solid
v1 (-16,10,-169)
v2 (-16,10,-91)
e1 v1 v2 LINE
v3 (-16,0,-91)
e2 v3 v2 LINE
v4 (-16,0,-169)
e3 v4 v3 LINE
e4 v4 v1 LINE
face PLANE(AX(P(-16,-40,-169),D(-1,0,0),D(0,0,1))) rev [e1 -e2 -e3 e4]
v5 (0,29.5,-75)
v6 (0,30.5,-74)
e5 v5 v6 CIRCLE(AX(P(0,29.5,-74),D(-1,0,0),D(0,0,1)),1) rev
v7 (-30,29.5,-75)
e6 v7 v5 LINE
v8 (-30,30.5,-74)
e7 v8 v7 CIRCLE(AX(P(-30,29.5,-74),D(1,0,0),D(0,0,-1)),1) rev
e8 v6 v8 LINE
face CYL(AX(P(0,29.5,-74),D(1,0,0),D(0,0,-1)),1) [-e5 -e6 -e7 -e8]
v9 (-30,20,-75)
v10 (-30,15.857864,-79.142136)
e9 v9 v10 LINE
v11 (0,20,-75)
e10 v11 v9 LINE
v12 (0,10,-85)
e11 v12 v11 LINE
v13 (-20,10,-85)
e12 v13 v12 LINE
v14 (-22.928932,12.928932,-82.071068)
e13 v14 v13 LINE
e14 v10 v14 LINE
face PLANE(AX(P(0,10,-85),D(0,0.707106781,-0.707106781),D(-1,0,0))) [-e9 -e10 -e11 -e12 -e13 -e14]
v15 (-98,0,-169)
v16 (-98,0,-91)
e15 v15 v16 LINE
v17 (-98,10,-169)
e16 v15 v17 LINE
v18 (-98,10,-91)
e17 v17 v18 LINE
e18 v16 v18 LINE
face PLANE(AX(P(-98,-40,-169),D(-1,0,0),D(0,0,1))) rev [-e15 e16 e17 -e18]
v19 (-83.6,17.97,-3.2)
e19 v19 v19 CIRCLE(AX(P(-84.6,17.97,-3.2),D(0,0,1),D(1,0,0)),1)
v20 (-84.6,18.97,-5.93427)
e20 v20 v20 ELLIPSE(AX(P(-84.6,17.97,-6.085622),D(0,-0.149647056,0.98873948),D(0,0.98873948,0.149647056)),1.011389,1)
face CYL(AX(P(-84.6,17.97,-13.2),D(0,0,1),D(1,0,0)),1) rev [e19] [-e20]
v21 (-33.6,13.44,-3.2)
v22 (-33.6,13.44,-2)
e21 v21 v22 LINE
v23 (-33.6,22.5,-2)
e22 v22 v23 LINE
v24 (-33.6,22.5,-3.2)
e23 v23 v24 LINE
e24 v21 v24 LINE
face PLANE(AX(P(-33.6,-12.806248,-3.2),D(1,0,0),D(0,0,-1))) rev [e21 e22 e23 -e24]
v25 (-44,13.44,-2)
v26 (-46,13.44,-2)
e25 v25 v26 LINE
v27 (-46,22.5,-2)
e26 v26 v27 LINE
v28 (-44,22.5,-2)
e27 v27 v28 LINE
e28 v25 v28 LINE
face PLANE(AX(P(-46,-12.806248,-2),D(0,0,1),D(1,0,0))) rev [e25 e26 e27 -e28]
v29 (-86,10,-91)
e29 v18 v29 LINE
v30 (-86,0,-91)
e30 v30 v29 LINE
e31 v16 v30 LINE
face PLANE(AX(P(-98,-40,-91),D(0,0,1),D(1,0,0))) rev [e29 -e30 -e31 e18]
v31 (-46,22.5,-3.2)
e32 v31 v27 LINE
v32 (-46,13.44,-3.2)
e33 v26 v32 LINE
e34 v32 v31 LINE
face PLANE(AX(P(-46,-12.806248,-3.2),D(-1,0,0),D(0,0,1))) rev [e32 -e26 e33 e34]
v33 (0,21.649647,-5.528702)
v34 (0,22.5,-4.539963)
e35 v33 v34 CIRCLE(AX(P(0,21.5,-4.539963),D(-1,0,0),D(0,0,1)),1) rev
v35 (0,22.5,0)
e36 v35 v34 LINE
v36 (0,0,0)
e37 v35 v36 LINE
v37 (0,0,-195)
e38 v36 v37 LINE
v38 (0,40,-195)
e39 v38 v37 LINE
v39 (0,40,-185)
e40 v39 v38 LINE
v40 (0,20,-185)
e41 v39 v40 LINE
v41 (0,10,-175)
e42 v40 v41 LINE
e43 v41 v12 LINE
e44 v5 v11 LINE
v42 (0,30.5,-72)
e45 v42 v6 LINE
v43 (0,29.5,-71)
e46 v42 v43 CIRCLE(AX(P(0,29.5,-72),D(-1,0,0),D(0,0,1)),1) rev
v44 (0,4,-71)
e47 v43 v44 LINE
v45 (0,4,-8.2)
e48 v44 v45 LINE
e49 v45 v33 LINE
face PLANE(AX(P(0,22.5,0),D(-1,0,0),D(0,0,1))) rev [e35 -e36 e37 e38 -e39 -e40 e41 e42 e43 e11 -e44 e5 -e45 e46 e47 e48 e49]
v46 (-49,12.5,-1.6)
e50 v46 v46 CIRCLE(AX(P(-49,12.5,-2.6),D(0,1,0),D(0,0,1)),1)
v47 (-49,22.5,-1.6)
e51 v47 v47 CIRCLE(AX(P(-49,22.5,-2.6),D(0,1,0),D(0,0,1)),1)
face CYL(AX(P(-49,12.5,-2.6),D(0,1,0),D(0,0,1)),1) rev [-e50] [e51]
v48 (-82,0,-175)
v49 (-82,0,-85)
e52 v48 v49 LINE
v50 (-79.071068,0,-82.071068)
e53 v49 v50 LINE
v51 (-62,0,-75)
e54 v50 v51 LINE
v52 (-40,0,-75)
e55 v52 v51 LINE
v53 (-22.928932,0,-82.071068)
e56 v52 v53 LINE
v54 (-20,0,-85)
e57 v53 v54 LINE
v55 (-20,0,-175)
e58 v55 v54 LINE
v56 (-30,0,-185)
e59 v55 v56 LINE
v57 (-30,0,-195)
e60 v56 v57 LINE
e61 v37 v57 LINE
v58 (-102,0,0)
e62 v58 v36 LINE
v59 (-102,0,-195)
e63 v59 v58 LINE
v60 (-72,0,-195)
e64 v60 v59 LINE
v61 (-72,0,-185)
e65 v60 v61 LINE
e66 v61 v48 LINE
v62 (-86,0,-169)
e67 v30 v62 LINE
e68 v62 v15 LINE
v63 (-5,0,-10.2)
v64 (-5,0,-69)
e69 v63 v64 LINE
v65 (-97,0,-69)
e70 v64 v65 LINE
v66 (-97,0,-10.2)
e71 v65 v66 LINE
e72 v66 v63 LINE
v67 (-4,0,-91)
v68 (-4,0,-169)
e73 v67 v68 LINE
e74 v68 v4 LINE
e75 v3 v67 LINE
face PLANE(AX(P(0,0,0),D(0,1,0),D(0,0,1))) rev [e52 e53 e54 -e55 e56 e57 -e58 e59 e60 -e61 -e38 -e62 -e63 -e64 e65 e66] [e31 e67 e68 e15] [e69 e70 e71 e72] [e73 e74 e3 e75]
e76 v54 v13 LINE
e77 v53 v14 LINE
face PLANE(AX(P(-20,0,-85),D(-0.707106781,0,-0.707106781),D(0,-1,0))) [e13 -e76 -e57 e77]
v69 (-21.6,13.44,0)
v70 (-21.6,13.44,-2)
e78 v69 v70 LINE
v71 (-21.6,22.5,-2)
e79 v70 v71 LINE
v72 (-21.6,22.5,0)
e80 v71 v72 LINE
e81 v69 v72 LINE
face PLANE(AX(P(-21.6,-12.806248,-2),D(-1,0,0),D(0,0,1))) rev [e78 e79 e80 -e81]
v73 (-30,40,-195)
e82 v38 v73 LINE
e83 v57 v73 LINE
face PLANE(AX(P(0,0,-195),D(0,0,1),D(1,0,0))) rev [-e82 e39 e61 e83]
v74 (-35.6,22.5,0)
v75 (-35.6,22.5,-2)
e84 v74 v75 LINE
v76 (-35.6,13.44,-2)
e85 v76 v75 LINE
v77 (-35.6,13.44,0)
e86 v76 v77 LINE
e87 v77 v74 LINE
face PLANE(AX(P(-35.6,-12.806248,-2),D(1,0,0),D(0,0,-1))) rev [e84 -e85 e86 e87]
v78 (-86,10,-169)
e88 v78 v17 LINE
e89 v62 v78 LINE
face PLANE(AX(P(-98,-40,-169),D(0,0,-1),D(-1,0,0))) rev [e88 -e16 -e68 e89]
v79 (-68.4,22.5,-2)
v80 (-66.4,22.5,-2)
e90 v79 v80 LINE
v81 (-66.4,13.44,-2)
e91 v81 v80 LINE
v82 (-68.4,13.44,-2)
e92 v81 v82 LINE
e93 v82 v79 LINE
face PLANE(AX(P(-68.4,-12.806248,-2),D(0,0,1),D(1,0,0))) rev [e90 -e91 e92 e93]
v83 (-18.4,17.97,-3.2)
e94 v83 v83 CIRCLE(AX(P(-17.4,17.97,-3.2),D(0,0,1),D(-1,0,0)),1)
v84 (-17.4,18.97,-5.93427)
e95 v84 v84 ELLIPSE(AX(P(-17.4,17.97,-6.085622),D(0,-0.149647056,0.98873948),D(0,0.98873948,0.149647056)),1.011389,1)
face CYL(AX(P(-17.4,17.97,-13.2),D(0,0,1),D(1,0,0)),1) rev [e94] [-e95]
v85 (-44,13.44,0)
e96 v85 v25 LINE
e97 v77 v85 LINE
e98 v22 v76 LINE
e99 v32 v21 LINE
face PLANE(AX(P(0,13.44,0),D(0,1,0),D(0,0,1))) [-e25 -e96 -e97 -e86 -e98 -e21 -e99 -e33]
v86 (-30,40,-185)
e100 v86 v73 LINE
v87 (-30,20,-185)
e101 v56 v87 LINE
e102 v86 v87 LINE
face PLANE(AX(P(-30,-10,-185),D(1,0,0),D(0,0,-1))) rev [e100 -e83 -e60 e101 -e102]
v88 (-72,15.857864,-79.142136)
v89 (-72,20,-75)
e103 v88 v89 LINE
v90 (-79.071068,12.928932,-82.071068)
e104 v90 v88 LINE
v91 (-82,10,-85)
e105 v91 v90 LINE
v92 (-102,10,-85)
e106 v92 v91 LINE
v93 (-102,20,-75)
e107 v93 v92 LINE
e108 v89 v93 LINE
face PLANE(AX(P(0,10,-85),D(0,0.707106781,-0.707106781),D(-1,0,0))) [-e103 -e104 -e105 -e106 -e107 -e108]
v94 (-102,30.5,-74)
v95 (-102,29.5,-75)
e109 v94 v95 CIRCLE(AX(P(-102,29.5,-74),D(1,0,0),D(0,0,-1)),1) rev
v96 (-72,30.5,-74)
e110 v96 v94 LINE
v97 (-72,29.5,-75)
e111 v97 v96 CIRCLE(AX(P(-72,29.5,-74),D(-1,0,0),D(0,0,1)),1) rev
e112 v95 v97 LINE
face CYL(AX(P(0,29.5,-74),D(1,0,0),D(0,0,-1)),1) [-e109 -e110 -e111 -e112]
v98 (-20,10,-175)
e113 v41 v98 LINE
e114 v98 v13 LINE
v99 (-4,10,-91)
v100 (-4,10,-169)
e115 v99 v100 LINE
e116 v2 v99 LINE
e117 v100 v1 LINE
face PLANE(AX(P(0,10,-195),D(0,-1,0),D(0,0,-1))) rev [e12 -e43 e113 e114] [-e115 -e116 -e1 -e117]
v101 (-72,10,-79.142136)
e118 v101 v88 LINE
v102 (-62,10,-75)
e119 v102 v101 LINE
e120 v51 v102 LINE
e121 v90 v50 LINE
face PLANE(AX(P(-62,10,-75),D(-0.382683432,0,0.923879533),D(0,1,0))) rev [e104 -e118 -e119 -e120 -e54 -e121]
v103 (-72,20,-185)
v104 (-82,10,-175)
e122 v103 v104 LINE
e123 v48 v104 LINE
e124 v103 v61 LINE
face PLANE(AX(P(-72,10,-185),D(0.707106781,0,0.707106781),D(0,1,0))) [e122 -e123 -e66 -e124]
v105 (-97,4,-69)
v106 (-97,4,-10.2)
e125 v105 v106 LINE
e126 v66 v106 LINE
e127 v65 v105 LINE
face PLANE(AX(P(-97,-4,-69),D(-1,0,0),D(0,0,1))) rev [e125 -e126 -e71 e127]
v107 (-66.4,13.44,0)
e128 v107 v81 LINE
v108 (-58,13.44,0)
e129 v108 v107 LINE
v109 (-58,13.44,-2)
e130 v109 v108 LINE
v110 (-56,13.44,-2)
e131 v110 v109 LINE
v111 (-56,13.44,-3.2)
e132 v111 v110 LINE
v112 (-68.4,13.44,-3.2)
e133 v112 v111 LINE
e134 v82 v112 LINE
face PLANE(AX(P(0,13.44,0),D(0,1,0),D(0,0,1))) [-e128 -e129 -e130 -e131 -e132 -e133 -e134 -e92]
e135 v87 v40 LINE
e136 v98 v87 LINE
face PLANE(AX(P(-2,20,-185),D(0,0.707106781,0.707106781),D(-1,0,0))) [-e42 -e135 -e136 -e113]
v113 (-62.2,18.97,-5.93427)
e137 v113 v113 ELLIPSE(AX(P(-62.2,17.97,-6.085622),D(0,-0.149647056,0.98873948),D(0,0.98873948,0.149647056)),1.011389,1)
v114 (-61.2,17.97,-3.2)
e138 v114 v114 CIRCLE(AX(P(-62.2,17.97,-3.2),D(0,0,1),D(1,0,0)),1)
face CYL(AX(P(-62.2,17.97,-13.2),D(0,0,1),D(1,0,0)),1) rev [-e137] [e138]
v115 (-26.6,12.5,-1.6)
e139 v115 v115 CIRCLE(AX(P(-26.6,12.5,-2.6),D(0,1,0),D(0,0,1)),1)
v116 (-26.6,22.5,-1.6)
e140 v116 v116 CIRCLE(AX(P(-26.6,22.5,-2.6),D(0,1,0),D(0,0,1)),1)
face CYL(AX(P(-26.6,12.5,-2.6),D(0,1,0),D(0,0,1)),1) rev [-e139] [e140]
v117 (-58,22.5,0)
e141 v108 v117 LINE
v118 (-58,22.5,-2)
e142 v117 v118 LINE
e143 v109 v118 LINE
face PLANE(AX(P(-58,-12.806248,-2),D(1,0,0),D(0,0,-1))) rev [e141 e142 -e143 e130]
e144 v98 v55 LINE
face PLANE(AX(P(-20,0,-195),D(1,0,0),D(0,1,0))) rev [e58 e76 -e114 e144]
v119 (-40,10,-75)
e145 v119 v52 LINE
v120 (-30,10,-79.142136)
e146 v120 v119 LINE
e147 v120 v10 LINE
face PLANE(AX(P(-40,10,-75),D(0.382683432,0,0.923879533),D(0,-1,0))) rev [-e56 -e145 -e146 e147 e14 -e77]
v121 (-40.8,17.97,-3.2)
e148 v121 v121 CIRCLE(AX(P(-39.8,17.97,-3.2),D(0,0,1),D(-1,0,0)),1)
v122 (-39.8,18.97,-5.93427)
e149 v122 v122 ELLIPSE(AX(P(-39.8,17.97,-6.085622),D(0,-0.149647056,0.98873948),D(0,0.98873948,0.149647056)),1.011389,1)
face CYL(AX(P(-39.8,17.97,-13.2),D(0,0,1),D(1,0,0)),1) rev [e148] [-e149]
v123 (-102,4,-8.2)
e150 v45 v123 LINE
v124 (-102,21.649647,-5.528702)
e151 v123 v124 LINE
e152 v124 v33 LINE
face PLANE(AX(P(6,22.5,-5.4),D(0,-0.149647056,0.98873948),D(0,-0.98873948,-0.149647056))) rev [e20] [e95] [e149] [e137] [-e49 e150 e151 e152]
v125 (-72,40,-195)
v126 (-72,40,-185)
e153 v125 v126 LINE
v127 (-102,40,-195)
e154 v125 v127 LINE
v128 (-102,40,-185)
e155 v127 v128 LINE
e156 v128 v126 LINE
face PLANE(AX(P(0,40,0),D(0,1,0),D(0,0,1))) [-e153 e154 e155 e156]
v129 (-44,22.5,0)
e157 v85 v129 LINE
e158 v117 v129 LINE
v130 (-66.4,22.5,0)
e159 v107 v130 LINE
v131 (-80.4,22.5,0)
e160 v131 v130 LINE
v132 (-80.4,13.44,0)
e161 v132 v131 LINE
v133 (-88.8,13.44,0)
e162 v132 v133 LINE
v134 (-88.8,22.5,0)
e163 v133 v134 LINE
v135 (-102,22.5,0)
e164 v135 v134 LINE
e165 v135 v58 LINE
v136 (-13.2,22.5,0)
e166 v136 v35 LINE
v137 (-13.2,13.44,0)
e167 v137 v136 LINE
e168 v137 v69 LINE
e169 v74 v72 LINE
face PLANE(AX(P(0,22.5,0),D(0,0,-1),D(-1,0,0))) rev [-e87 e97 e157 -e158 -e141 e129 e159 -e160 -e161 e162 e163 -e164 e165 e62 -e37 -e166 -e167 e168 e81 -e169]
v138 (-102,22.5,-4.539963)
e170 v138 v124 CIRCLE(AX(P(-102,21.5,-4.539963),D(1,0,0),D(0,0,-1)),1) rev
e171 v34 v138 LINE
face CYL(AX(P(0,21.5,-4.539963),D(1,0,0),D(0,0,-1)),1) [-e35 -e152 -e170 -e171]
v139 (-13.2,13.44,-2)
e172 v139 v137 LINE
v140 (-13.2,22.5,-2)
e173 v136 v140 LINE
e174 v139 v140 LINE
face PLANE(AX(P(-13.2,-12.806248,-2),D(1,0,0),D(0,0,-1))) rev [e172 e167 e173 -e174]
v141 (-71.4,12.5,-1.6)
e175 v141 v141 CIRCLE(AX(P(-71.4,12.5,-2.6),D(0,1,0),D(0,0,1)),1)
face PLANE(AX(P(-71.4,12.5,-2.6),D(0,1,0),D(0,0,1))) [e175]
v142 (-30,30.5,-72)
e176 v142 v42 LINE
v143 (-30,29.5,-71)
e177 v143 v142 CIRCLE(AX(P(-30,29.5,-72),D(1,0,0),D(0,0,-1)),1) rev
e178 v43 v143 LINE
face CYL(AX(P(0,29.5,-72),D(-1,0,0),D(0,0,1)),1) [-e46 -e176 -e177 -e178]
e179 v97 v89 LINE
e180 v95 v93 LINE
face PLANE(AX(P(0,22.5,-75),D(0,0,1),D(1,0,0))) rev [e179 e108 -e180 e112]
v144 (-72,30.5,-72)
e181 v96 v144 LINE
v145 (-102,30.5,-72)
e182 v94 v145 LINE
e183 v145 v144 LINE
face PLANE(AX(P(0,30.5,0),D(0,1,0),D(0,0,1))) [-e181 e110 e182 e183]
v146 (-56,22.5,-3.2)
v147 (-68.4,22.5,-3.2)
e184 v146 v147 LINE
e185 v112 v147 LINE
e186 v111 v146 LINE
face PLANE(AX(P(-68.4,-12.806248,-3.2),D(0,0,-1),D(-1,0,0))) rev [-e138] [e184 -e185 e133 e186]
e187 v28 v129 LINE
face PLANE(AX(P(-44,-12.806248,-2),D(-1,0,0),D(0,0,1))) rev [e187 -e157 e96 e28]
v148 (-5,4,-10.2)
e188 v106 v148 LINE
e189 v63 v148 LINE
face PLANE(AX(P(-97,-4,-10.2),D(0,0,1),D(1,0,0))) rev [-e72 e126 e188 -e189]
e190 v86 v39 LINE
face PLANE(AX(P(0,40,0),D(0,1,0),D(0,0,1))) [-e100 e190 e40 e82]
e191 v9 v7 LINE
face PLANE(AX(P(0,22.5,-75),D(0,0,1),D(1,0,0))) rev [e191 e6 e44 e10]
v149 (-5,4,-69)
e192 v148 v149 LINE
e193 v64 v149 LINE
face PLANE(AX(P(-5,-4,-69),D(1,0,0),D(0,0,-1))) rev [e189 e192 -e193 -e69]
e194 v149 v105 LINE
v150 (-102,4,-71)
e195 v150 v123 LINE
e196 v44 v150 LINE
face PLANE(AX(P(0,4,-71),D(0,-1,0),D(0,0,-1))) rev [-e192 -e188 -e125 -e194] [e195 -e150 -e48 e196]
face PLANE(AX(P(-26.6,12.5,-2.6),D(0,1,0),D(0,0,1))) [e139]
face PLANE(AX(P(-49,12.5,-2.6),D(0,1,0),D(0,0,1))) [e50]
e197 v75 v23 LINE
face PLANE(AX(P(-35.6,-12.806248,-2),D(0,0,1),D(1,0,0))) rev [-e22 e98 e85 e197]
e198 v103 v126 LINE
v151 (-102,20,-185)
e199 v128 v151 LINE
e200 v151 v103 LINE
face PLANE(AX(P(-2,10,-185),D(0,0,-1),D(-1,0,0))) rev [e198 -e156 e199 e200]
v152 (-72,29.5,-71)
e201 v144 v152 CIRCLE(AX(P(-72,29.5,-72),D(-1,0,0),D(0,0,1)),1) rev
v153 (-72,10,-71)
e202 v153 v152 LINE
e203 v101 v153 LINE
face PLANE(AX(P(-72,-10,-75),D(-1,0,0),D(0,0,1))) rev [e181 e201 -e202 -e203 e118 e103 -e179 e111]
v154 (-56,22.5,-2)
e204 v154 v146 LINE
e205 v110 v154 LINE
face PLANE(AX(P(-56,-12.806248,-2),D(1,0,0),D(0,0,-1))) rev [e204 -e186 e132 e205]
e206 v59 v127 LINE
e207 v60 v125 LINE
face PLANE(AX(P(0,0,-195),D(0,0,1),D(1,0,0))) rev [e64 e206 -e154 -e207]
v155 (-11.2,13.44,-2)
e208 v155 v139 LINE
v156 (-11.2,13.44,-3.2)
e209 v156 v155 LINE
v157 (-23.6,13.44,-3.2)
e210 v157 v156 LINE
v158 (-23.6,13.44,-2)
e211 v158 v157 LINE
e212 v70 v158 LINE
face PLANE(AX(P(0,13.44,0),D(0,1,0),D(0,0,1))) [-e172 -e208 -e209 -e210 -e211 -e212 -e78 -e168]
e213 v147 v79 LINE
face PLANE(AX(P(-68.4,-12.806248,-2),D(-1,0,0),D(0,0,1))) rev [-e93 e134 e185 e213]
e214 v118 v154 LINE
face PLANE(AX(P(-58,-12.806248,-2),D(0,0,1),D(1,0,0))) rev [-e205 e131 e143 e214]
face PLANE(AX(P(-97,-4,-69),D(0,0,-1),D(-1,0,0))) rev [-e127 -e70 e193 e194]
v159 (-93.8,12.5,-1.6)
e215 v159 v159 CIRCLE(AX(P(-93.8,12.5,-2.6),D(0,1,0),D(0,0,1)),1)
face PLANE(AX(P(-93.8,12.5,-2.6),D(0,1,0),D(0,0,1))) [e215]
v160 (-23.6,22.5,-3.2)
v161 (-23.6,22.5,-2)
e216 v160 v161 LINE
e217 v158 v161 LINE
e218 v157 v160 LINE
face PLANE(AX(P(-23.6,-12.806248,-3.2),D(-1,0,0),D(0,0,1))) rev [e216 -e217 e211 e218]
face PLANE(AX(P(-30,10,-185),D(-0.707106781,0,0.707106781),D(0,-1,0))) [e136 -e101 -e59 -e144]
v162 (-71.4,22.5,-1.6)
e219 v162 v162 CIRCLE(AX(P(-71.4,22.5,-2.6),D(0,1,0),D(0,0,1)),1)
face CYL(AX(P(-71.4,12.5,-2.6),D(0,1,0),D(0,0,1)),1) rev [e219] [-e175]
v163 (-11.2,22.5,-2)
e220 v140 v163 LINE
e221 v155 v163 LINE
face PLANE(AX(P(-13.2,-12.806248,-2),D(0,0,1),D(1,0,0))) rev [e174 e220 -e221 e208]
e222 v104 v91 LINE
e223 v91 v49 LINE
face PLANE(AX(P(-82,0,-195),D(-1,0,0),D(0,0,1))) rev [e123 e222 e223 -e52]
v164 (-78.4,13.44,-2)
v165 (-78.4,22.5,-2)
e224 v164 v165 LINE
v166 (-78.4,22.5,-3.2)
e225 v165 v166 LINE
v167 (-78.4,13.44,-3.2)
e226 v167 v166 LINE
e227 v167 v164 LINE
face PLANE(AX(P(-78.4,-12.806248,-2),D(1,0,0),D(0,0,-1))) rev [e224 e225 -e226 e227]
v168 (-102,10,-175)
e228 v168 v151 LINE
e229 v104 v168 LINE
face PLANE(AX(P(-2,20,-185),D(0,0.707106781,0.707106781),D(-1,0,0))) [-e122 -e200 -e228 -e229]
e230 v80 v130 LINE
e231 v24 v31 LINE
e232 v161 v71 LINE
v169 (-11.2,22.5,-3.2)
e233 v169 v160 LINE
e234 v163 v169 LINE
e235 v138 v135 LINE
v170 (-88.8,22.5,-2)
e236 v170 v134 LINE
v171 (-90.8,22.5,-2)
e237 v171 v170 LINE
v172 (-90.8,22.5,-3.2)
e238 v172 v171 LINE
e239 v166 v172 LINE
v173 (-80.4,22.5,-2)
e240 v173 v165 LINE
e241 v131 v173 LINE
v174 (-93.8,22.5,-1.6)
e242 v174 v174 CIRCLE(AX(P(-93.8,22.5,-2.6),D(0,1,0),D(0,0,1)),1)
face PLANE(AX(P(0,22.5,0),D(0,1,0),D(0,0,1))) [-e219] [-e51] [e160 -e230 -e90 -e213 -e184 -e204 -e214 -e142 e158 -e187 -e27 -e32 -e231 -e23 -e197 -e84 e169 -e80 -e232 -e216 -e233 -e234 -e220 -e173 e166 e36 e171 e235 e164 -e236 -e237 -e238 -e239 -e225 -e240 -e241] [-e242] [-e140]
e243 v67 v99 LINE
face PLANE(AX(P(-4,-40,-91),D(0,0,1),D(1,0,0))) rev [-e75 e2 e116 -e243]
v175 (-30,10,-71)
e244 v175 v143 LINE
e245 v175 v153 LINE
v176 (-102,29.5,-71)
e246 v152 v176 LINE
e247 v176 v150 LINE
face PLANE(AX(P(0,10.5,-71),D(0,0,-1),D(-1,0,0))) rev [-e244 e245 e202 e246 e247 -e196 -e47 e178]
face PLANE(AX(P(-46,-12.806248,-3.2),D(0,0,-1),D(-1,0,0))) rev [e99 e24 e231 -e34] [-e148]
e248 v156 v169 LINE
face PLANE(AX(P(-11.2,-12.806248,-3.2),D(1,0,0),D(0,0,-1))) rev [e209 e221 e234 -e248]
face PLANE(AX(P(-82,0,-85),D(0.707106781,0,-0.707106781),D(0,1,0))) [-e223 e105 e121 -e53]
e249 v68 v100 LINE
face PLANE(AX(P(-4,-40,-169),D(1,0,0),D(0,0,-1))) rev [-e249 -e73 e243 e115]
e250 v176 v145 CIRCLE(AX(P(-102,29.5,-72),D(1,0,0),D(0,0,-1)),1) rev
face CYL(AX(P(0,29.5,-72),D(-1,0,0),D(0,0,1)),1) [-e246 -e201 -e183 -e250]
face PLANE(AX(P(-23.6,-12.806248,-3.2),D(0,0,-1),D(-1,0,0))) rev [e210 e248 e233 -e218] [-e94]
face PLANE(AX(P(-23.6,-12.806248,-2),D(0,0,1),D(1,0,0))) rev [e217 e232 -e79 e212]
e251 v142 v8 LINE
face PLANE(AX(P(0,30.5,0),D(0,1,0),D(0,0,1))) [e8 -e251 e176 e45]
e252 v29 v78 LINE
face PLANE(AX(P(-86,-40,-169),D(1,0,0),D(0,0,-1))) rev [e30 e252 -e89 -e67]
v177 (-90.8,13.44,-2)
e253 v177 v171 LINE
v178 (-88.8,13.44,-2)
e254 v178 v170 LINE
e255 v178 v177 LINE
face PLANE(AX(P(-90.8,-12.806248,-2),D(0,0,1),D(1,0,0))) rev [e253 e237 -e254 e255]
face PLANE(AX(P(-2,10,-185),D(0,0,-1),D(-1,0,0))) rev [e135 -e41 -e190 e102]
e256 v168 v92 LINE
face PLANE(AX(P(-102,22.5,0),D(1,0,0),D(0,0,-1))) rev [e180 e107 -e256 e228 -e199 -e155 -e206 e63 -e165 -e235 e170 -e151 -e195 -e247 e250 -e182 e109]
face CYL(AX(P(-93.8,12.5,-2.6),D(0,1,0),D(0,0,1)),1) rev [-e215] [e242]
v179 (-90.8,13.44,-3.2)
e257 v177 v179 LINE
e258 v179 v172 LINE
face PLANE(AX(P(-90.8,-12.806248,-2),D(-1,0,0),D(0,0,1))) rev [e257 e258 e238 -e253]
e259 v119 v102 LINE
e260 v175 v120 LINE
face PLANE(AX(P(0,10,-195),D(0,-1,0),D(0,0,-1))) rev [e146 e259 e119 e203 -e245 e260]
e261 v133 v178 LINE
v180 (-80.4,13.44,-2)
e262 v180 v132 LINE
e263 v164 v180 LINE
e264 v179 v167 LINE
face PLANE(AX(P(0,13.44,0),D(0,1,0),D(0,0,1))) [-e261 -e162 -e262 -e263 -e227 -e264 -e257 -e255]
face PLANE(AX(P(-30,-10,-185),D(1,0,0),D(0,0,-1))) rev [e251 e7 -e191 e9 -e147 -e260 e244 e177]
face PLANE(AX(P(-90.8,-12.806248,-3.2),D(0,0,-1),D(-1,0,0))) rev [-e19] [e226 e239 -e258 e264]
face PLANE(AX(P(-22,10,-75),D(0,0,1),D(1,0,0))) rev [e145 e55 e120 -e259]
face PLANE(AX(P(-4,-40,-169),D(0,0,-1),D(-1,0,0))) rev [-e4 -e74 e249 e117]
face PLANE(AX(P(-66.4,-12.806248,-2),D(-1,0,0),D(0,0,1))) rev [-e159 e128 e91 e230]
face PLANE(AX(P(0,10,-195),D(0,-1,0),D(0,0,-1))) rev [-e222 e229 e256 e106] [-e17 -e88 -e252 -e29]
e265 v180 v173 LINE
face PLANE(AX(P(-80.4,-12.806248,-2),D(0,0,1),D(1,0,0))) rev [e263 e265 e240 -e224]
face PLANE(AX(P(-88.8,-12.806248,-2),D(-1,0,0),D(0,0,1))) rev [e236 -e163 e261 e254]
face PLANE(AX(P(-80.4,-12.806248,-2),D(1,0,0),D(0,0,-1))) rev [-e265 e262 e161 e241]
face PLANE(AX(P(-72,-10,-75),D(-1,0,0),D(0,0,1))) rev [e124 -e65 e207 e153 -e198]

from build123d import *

# Parameters (mm, degrees)
SKETCH_1_W           = 102
SKETCH_1_H           = 75
EXTRUDE_1_DEPTH      = 22.5
CUT_EXTRUDE_1_DEPTH  = 9.06
SKETCH_3_W           = 102
SKETCH_3_H           = 66.8
CUT_EXTRUDE_2_DEPTH  = 12
SKETCH_4_W           = 62.8
SKETCH_4_H           = 6.5
CUT_EXTRUDE_3_DEPTH  = 129.589463021
SKETCH_6_W           = 102
SKETCH_6_H           = 4
EXTRUDE_2_DEPTH      = 20
SKETCH_7_W           = 92
SKETCH_7_H           = 58.8
CUT_EXTRUDE_5_DEPTH  = 8
CUT_EXTRUDE_6_DEPTH  = 108
FILLET_2_R           = 1
SKETCH_10_R          = 1
CUT_EXTRUDE_7_DEPTH  = 10
SKETCH_14_R          = 1
CUT_EXTRUDE_8_DEPTH  = 10
SKETCH_15_W          = 20
SKETCH_15_H          = 10
EXTRUDE_3_DEPTH      = 120
SKETCH_16_W          = 10
SKETCH_16_H          = 10
EXTRUDE_4_DEPTH      = 80
CHAMFER_1_SIZE       = 10
SKETCH_17_W          = 102
SKETCH_17_H          = 10
EXTRUDE_5_DEPTH      = 30
CUT_EXTRUDE_9_DEPTH  = 50
SKETCH_20_W          = 12
SKETCH_20_H          = 78
CUT_EXTRUDE_10_DEPTH = 50
SKETCH_21_W          = 4
SKETCH_21_H          = 10
EXTRUDE_6_DEPTH      = 50
CHAMFER_2_SIZE       = 10
CHAMFER_3_SIZE       = 10


with BuildPart() as part:
    # 草图1 → 凸台-拉伸1 (new body)
    with BuildSketch(Plane(origin=(0, 0, 0), x_dir=(1, 0, 0), z_dir=(0, 1, 0))):
        with Locations((-51, 37.5)):
            Rectangle(SKETCH_1_W, SKETCH_1_H)
    extrude(amount=EXTRUDE_1_DEPTH)

    # 草图2 → 切除-拉伸1 (cut)
    with BuildSketch(Plane(origin=(0, 22.5, 0), x_dir=(1, 0, 0), z_dir=(0, 1, 0))):
        Polygon((-90.8, 2), (-88.8, 2), (-88.8, 0), (-80.4, 0), (-80.4, 2), (-78.4, 2), (-78.4, 3.2), (-90.8, 3.2), align=None)
        Polygon((-68.4, 2), (-66.4, 2), (-66.4, 0), (-58, 0), (-58, 2), (-56, 2), (-56, 3.2), (-68.4, 3.2), align=None)
        Polygon((-46, 3.2), (-33.6, 3.2), (-33.6, 2), (-35.6, 2), (-35.6, 0), (-44, 0), (-44, 2), (-46, 2), align=None)
        Polygon((-23.6, 3.2), (-11.2, 3.2), (-11.2, 2), (-13.2, 2), (-13.2, 0), (-21.6, 0), (-21.6, 2), (-23.6, 2), align=None)
    extrude(amount=-CUT_EXTRUDE_1_DEPTH, mode=Mode.SUBTRACT)

    # 草图3 → 切除-拉伸2 (cut)
    with BuildSketch(Plane(origin=(0, 22.5, 0), x_dir=(1, 0, 0), z_dir=(0, 1, 0))):
        with Locations((-51, 41.6)):
            Rectangle(SKETCH_3_W, SKETCH_3_H)
    extrude(amount=-CUT_EXTRUDE_2_DEPTH, mode=Mode.SUBTRACT)

    # 草图4 → 切除-拉伸3 (cut, through all)
    with BuildSketch(Plane.ZY.offset(102)):
        with Locations((-39.6, 7.25)):
            Rectangle(SKETCH_4_W, SKETCH_4_H)
    extrude(amount=-CUT_EXTRUDE_3_DEPTH, mode=Mode.SUBTRACT)

    # 草图6 → 凸台-拉伸2 (add)
    with BuildSketch(Plane(origin=(0, 10.5, 0), x_dir=(1, 0, 0), z_dir=(0, 1, 0))):
        with Locations((-51, 73)):
            Rectangle(SKETCH_6_W, SKETCH_6_H)
    extrude(amount=EXTRUDE_2_DEPTH)

    # 草图7 → 切除-拉伸5 (cut)
    with BuildSketch(Plane(origin=(0, 4, 0), x_dir=(1, 0, 0), z_dir=(0, 1, 0))):
        with Locations((-51, 39.6)):
            Rectangle(SKETCH_7_W, SKETCH_7_H)
    extrude(amount=-CUT_EXTRUDE_5_DEPTH, mode=Mode.SUBTRACT)

    # 草图9 → 切除-拉伸6 (cut)
    with BuildSketch(Plane.ZY.offset(102)):
        Polygon((-8.2, 22.5), (-5.4, 22.5), (-8.2, 4), align=None)
    extrude(amount=-CUT_EXTRUDE_6_DEPTH, mode=Mode.SUBTRACT)

    # 圆角2
    fillet_2_edges = [part.edges().sort_by_distance(p)[0] for p in [
        (-51, 30.5, -71),
        (-51, 30.5, -75),
        (-51, 22.5, -5.4),
    ]]
    fillet(fillet_2_edges, radius=FILLET_2_R)

    # 草图10 → 切除-拉伸7 (cut)
    with BuildSketch(Plane.XY.offset(-3.2)):
        with Locations((-84.6, 17.97)):
            Circle(SKETCH_10_R)
        with Locations((-62.2, 17.97)):
            Circle(SKETCH_10_R)
        with Locations(Location((-39.8, 17.97, 0), (0, 0, 90))):
            Circle(SKETCH_10_R)
        with Locations(Location((-17.4, 17.97, 0), (0, 0, 90))):
            Circle(SKETCH_10_R)
    extrude(amount=-CUT_EXTRUDE_7_DEPTH, mode=Mode.SUBTRACT)

    # 草图14 → 切除-拉伸8 (cut)
    with BuildSketch(Plane(origin=(0, 22.5, 0), x_dir=(1, 0, 0), z_dir=(0, 1, 0))):
        with Locations(Location((-93.8, 2.6, 0), (0, 0, 270))):
            Circle(SKETCH_14_R)
        with Locations(Location((-71.4, 2.6, 0), (0, 0, 270))):
            Circle(SKETCH_14_R)
        with Locations(Location((-49, 2.6, 0), (0, 0, 270))):
            Circle(SKETCH_14_R)
        with Locations(Location((-26.6, 2.6, 0), (0, 0, 270))):
            Circle(SKETCH_14_R)
    extrude(amount=-CUT_EXTRUDE_8_DEPTH, mode=Mode.SUBTRACT)

    # 草图15 → 凸台-拉伸3 (add)
    with BuildSketch(Plane(origin=(0, 0, -75), x_dir=(-1, 0, 0), z_dir=(0, 0, -1))):
        with Locations((10, 5)):
            Rectangle(SKETCH_15_W, SKETCH_15_H)
        with Locations((92, 5)):
            Rectangle(SKETCH_15_W, SKETCH_15_H)
    extrude(amount=EXTRUDE_3_DEPTH)

    # 草图16 → 凸台-拉伸4 (add)
    with BuildSketch(Plane(origin=(-82, 0, 0), x_dir=(0, 0, -1), z_dir=(1, 0, 0))):
        with Locations((190, 5)):
            Rectangle(SKETCH_16_W, SKETCH_16_H)
    extrude(amount=EXTRUDE_4_DEPTH)

    # 倒角1
    chamfer_1_edges = [part.edges().sort_by_distance(p)[0] for p in [
        (-20, 5, -75),
        (-82, 5, -75),
        (-20, 5, -185),
        (-82, 5, -185),
    ]]
    chamfer(chamfer_1_edges, length=CHAMFER_1_SIZE)

    # 草图17 → 凸台-拉伸5 (add)
    with BuildSketch(Plane(origin=(0, 10, 0), x_dir=(1, 0, 0), z_dir=(0, 1, 0))):
        with Locations((-51, 190)):
            Rectangle(SKETCH_17_W, SKETCH_17_H)
    extrude(amount=EXTRUDE_5_DEPTH)

    # 草图19 → 切除-拉伸9 (cut)
    with BuildSketch(Plane(origin=(0, 40, 0), x_dir=(1, 0, 0), z_dir=(0, 1, 0))):
        Polygon((-72, 185), (-72, 75), (-72, 71), (-30, 71), (-30, 75), (-30, 185), (-30, 195), (-72, 195), align=None)
    extrude(amount=-CUT_EXTRUDE_9_DEPTH, mode=Mode.SUBTRACT)

    # 草图20 → 切除-拉伸10 (cut)
    with BuildSketch(Plane(origin=(0, 10, 0), x_dir=(1, 0, 0), z_dir=(0, 1, 0))):
        with Locations((-92, 130)):
            Rectangle(SKETCH_20_W, SKETCH_20_H)
        with Locations((-10, 130)):
            Rectangle(SKETCH_20_W, SKETCH_20_H)
    extrude(amount=-CUT_EXTRUDE_10_DEPTH, mode=Mode.SUBTRACT)

    # 草图21 → 凸台-拉伸6 (add)
    with BuildSketch(Plane(origin=(-72, 0, 0), x_dir=(0, 0, -1), z_dir=(1, 0, 0))):
        with Locations((73, 5)):
            Rectangle(SKETCH_21_W, SKETCH_21_H)
    extrude(amount=EXTRUDE_6_DEPTH)

    # 倒角2
    # the kernel refuses this chamfer: 10 mm, written as the material it adds along each edge
    with BuildSketch(Plane(origin=(-30, 0, -75), x_dir=(-0.9998910622590237, 0, 0.01476020374253316), z_dir=(0, 1, 0))) as chamfer_2_piece_1:
        Polygon((CHAMFER_2_SIZE * 0.999891062259, -CHAMFER_2_SIZE * 0.0147602037425), (-CHAMFER_2_SIZE * 0.717466790729, -CHAMFER_2_SIZE * 0.696592710413), (0, 0), align=None)
    extrude(amount=10)
    with BuildSketch(Plane(origin=(-72, 0, -75), x_dir=(0.9998910622590237, 0, 0.01476020374253316), z_dir=(0, 1, 0))) as chamfer_2_piece_2:
        Polygon((CHAMFER_2_SIZE * 0.999891062259, CHAMFER_2_SIZE * 0.0147602037425), (-CHAMFER_2_SIZE * 0.717466790729, CHAMFER_2_SIZE * 0.696592710413), (0, 0), align=None)
    extrude(amount=10)

    # 倒角3
    # the kernel refuses this chamfer: 10 mm, written as the material it adds along each edge
    with BuildSketch(Plane(origin=(-30, 10, -75), x_dir=(0, -0.027495876610585588, -0.9996219169112968), z_dir=(1, 0, 0))) as chamfer_3_piece_1_section:
        Polygon((CHAMFER_3_SIZE * 0.999621916911, CHAMFER_3_SIZE * 0.0274958766106), (-CHAMFER_3_SIZE * 0.0274958766106, CHAMFER_3_SIZE * 0.999621916911), (0, 0), align=None)
    chamfer_3_piece_1 = extrude(amount=30, mode=Mode.PRIVATE)
    chamfer_3_piece_1 = split(chamfer_3_piece_1, bisect_by=Plane(origin=(-27.264199431, 13.202688984, -77.735800569), z_dir=(-0.7071067811865476, 0, -0.7071067811865476)), keep=Keep.TOP, mode=Mode.PRIVATE)
    chamfer_3_piece_1 = split(chamfer_3_piece_1, bisect_by=Plane(origin=(-28.501657804, 13.202688984, -79.762769282), z_dir=(0.382683432365518, 0, 0.9238795325111094)), keep=Keep.TOP, mode=Mode.PRIVATE)
    add(chamfer_3_piece_1)
    with BuildSketch(Plane(origin=(-30, 10, -75), x_dir=(0, -0.027495876610585588, -0.9996219169112968), z_dir=(1, 0, 0))) as chamfer_3_piece_2_section:
        Polygon((CHAMFER_3_SIZE * 0.999621916911, CHAMFER_3_SIZE * 0.0274958766106), (-CHAMFER_3_SIZE * 0.0274958766106, CHAMFER_3_SIZE * 0.999621916911), (0, 0), align=None)
    chamfer_3_piece_2 = extrude(amount=30, mode=Mode.PRIVATE)
    chamfer_3_piece_2 = split(chamfer_3_piece_2, bisect_by=Plane(origin=(-20, 10.692968827, -83.273838091), z_dir=(-1, 0, 0)), keep=Keep.TOP, mode=Mode.PRIVATE)
    chamfer_3_piece_2 = split(chamfer_3_piece_2, bisect_by=Plane(origin=(-21.434414815, 10.692968827, -83.565585185), z_dir=(0.7071067811865476, 0, 0.7071067811865476)), keep=Keep.TOP, mode=Mode.PRIVATE)
    chamfer_3_piece_2 = split(chamfer_3_piece_2, bisect_by=Plane(origin=(-20.979016586, 10.692968827, -82.8787493), z_dir=(-0.382683432365518, 0, -0.9238795325111094)), keep=Keep.TOP, mode=Mode.PRIVATE)
    add(chamfer_3_piece_2)
    with BuildSketch(Plane(origin=(-30, 10, -75), x_dir=(0, -0.027495876610585588, -0.9996219169112968), z_dir=(1, 0, 0))) as chamfer_3_piece_3_section:
        Polygon((CHAMFER_3_SIZE * 0.999621916911, CHAMFER_3_SIZE * 0.0274958766106), (-CHAMFER_3_SIZE * 0.0274958766106, CHAMFER_3_SIZE * 0.999621916911), (0, 0), align=None)
    chamfer_3_piece_3 = extrude(amount=30, mode=Mode.PRIVATE)
    chamfer_3_piece_3 = split(chamfer_3_piece_3, bisect_by=Plane(origin=(-20, 13.842005871, -77.275424956), z_dir=(-1, 0, 0)), keep=Keep.TOP, mode=Mode.PRIVATE)
    chamfer_3_piece_3 = split(chamfer_3_piece_3, bisect_by=Plane(origin=(-25.789156248, 13.842005871, -79.210843752), z_dir=(0.7071067811865476, 0, 0.7071067811865476)), keep=Keep.TOP, mode=Mode.PRIVATE)
    chamfer_3_piece_3 = split(chamfer_3_piece_3, bisect_by=Plane(origin=(-25.413818648, 13.842005871, -81.041794139), z_dir=(0.382683432365518, 0, 0.9238795325111094)), keep=Keep.TOP, mode=Mode.PRIVATE)
    add(chamfer_3_piece_3)
    with BuildSketch(Plane(origin=(-30, 10, -75), x_dir=(0, -0.027495876610585588, -0.9996219169112968), z_dir=(1, 0, 0))) as chamfer_3_piece_4_section:
        Polygon((CHAMFER_3_SIZE * 0.999621916911, CHAMFER_3_SIZE * 0.0274958766106), (-CHAMFER_3_SIZE * 0.0274958766106, CHAMFER_3_SIZE * 0.999621916911), (0, 0), align=None)
    chamfer_3_piece_4 = extrude(amount=30, mode=Mode.PRIVATE)
    chamfer_3_piece_4 = split(chamfer_3_piece_4, bisect_by=Plane(origin=(-20, 10.112698884, -84.362076481), z_dir=(1, 0, 0)), keep=Keep.TOP, mode=Mode.PRIVATE)
    chamfer_3_piece_4 = split(chamfer_3_piece_4, bisect_by=Plane(origin=(-19.665237882, 10.112698884, -85.334762118), z_dir=(0.7071067811865476, 0, 0.7071067811865476)), keep=Keep.TOP, mode=Mode.PRIVATE)
    chamfer_3_piece_4 = split(chamfer_3_piece_4, bisect_by=Plane(origin=(-18.50296184, 10.112698884, -83.904364757), z_dir=(-0.382683432365518, 0, -0.9238795325111094)), keep=Keep.TOP, mode=Mode.PRIVATE)
    add(chamfer_3_piece_4)
    with BuildSketch(Plane(origin=(-30, 10, -75), x_dir=(0, -0.027495876610585588, -0.9996219169112968), z_dir=(1, 0, 0))) as chamfer_3_piece_5_section:
        Polygon((CHAMFER_3_SIZE * 0.999621916911, CHAMFER_3_SIZE * 0.0274958766106), (-CHAMFER_3_SIZE * 0.0274958766106, CHAMFER_3_SIZE * 0.999621916911), (0, 0), align=None)
    chamfer_3_piece_5 = extrude(amount=30, mode=Mode.PRIVATE)
    chamfer_3_piece_5 = split(chamfer_3_piece_5, bisect_by=Plane(origin=(-20, 13.309351743, -78.276203383), z_dir=(1, 0, 0)), keep=Keep.TOP, mode=Mode.PRIVATE)
    chamfer_3_piece_5 = split(chamfer_3_piece_5, bisect_by=Plane(origin=(-13.20849449, 13.309351743, -86.097404939), z_dir=(0.382683432365518, 0, 0.9238795325111094)), keep=Keep.TOP, mode=Mode.PRIVATE)
    add(chamfer_3_piece_5)
    with BuildSketch(Plane(origin=(-72, 10, -75), x_dir=(0, -0.027495876610586147, -0.9996219169112968), z_dir=(-1, 0, 0))) as chamfer_3_piece_6_section:
        Polygon((CHAMFER_3_SIZE * 0.999621916911, -CHAMFER_3_SIZE * 0.0274958766106), (-CHAMFER_3_SIZE * 0.0274958766106, -CHAMFER_3_SIZE * 0.999621916911), (0, 0), align=None)
    chamfer_3_piece_6 = extrude(amount=30, mode=Mode.PRIVATE)
    chamfer_3_piece_6 = split(chamfer_3_piece_6, bisect_by=Plane(origin=(-73.498342196, 13.202688984, -79.762769282), z_dir=(-0.382683432365518, 0, 0.9238795325111094)), keep=Keep.TOP, mode=Mode.PRIVATE)
    chamfer_3_piece_6 = split(chamfer_3_piece_6, bisect_by=Plane(origin=(-74.735800569, 13.202688984, -77.735800569), z_dir=(0.7071067811865476, 0, -0.7071067811865476)), keep=Keep.TOP, mode=Mode.PRIVATE)
    add(chamfer_3_piece_6)
    with BuildSketch(Plane(origin=(-72, 10, -75), x_dir=(0, -0.027495876610586147, -0.9996219169112968), z_dir=(-1, 0, 0))) as chamfer_3_piece_7_section:
        Polygon((CHAMFER_3_SIZE * 0.999621916911, -CHAMFER_3_SIZE * 0.0274958766106), (-CHAMFER_3_SIZE * 0.0274958766106, -CHAMFER_3_SIZE * 0.999621916911), (0, 0), align=None)
    chamfer_3_piece_7 = extrude(amount=30, mode=Mode.PRIVATE)
    chamfer_3_piece_7 = split(chamfer_3_piece_7, bisect_by=Plane(origin=(-81.020983414, 10.692968827, -82.8787493), z_dir=(0.382683432365518, 0, -0.9238795325111094)), keep=Keep.TOP, mode=Mode.PRIVATE)
    chamfer_3_piece_7 = split(chamfer_3_piece_7, bisect_by=Plane(origin=(-80.565585185, 10.692968827, -83.565585185), z_dir=(-0.7071067811865476, 0, 0.7071067811865476)), keep=Keep.TOP, mode=Mode.PRIVATE)
    chamfer_3_piece_7 = split(chamfer_3_piece_7, bisect_by=Plane(origin=(-82, 10.692968827, -83.273838091), z_dir=(1, 0, 0)), keep=Keep.TOP, mode=Mode.PRIVATE)
    add(chamfer_3_piece_7)
    with BuildSketch(Plane(origin=(-72, 10, -75), x_dir=(0, -0.027495876610586147, -0.9996219169112968), z_dir=(-1, 0, 0))) as chamfer_3_piece_8_section:
        Polygon((CHAMFER_3_SIZE * 0.999621916911, -CHAMFER_3_SIZE * 0.0274958766106), (-CHAMFER_3_SIZE * 0.0274958766106, -CHAMFER_3_SIZE * 0.999621916911), (0, 0), align=None)
    chamfer_3_piece_8 = extrude(amount=30, mode=Mode.PRIVATE)
    chamfer_3_piece_8 = split(chamfer_3_piece_8, bisect_by=Plane(origin=(-76.586181352, 13.842005871, -81.041794139), z_dir=(-0.382683432365518, 0, 0.9238795325111094)), keep=Keep.TOP, mode=Mode.PRIVATE)
    chamfer_3_piece_8 = split(chamfer_3_piece_8, bisect_by=Plane(origin=(-76.210843752, 13.842005871, -79.210843752), z_dir=(-0.7071067811865476, 0, 0.7071067811865476)), keep=Keep.TOP, mode=Mode.PRIVATE)
    chamfer_3_piece_8 = split(chamfer_3_piece_8, bisect_by=Plane(origin=(-82, 13.842005871, -77.275424956), z_dir=(1, 0, 0)), keep=Keep.TOP, mode=Mode.PRIVATE)
    add(chamfer_3_piece_8)
    with BuildSketch(Plane(origin=(-72, 10, -75), x_dir=(0, -0.027495876610586147, -0.9996219169112968), z_dir=(-1, 0, 0))) as chamfer_3_piece_9_section:
        Polygon((CHAMFER_3_SIZE * 0.999621916911, -CHAMFER_3_SIZE * 0.0274958766106), (-CHAMFER_3_SIZE * 0.0274958766106, -CHAMFER_3_SIZE * 0.999621916911), (0, 0), align=None)
    chamfer_3_piece_9 = extrude(amount=30, mode=Mode.PRIVATE)
    chamfer_3_piece_9 = split(chamfer_3_piece_9, bisect_by=Plane(origin=(-83.49703816, 10.112698884, -83.904364757), z_dir=(0.382683432365518, 0, -0.9238795325111094)), keep=Keep.TOP, mode=Mode.PRIVATE)
    chamfer_3_piece_9 = split(chamfer_3_piece_9, bisect_by=Plane(origin=(-82.334762118, 10.112698884, -85.334762118), z_dir=(-0.7071067811865476, 0, 0.7071067811865476)), keep=Keep.TOP, mode=Mode.PRIVATE)
    chamfer_3_piece_9 = split(chamfer_3_piece_9, bisect_by=Plane(origin=(-82, 10.112698884, -84.362076481), z_dir=(-1, 0, 0)), keep=Keep.TOP, mode=Mode.PRIVATE)
    add(chamfer_3_piece_9)
    with BuildSketch(Plane(origin=(-72, 10, -75), x_dir=(0, -0.027495876610586147, -0.9996219169112968), z_dir=(-1, 0, 0))) as chamfer_3_piece_10_section:
        Polygon((CHAMFER_3_SIZE * 0.999621916911, -CHAMFER_3_SIZE * 0.0274958766106), (-CHAMFER_3_SIZE * 0.0274958766106, -CHAMFER_3_SIZE * 0.999621916911), (0, 0), align=None)
    chamfer_3_piece_10 = extrude(amount=30, mode=Mode.PRIVATE)
    chamfer_3_piece_10 = split(chamfer_3_piece_10, bisect_by=Plane(origin=(-88.79150551, 13.309351743, -86.097404939), z_dir=(-0.382683432365518, 0, 0.9238795325111094)), keep=Keep.TOP, mode=Mode.PRIVATE)
    chamfer_3_piece_10 = split(chamfer_3_piece_10, bisect_by=Plane(origin=(-82, 13.309351743, -78.276203383), z_dir=(-1, 0, 0)), keep=Keep.TOP, mode=Mode.PRIVATE)
    add(chamfer_3_piece_10)
    with BuildSketch(Plane(origin=(-72, 10, -185), x_dir=(0, -0.027495876610586528, 0.9996219169112968), z_dir=(-1, 0, 0))) as chamfer_3_piece_11_section:
        Polygon((CHAMFER_3_SIZE * 0.999621916911, CHAMFER_3_SIZE * 0.0274958766106), (-CHAMFER_3_SIZE * 0.0274958766106, CHAMFER_3_SIZE * 0.999621916911), (0, 0), align=None)
    chamfer_3_piece_11 = extrude(amount=30, mode=Mode.PRIVATE)
    chamfer_3_piece_11 = split(chamfer_3_piece_11, bisect_by=Plane(origin=(-82, 13.801206253, -182.64685828), z_dir=(1, 0, 0)), keep=Keep.TOP, mode=Mode.PRIVATE)
    chamfer_3_piece_11 = split(chamfer_3_piece_11, bisect_by=Plane(origin=(-76.267264743, 13.801206253, -180.732735257), z_dir=(-0.7071067811865476, 0, -0.7071067811865476)), keep=Keep.TOP, mode=Mode.PRIVATE)
    add(chamfer_3_piece_11)
    with BuildSketch(Plane(origin=(-72, 10, -185), x_dir=(0, -0.027495876610586528, 0.9996219169112968), z_dir=(-1, 0, 0))) as chamfer_3_piece_12_section:
        Polygon((CHAMFER_3_SIZE * 0.999621916911, CHAMFER_3_SIZE * 0.0274958766106), (-CHAMFER_3_SIZE * 0.0274958766106, CHAMFER_3_SIZE * 0.999621916911), (0, 0), align=None)
    chamfer_3_piece_12 = extrude(amount=30, mode=Mode.PRIVATE)
    chamfer_3_piece_12 = split(chamfer_3_piece_12, bisect_by=Plane(origin=(-82, 13.297973997, -181.702135358), z_dir=(-1, 0, 0)), keep=Keep.TOP, mode=Mode.PRIVATE)
    chamfer_3_piece_12 = split(chamfer_3_piece_12, bisect_by=Plane(origin=(-83.648983948, 13.297973997, -173.351016052), z_dir=(-0.7071067811865476, 0, -0.7071067811865476)), keep=Keep.TOP, mode=Mode.PRIVATE)
    add(chamfer_3_piece_12)
    with BuildSketch(Plane(origin=(0, 10, -185), x_dir=(0, -0.027495876610586528, 0.9996219169112968), z_dir=(-1, 0, 0))) as chamfer_3_piece_13_section:
        Polygon((CHAMFER_3_SIZE * 0.999621916911, CHAMFER_3_SIZE * 0.0274958766106), (-CHAMFER_3_SIZE * 0.0274958766106, CHAMFER_3_SIZE * 0.999621916911), (0, 0), align=None)
    chamfer_3_piece_13 = extrude(amount=30, mode=Mode.PRIVATE)
    chamfer_3_piece_13 = split(chamfer_3_piece_13, bisect_by=Plane(origin=(-18.351016052, 13.297973997, -173.351016052), z_dir=(0.7071067811865476, 0, -0.7071067811865476)), keep=Keep.TOP, mode=Mode.PRIVATE)
    chamfer_3_piece_13 = split(chamfer_3_piece_13, bisect_by=Plane(origin=(-20, 13.297973997, -181.702135358), z_dir=(1, 0, 0)), keep=Keep.TOP, mode=Mode.PRIVATE)
    add(chamfer_3_piece_13)
    with BuildSketch(Plane(origin=(0, 10, -185), x_dir=(0, -0.027495876610586528, 0.9996219169112968), z_dir=(-1, 0, 0))) as chamfer_3_piece_14_section:
        Polygon((CHAMFER_3_SIZE * 0.999621916911, CHAMFER_3_SIZE * 0.0274958766106), (-CHAMFER_3_SIZE * 0.0274958766106, CHAMFER_3_SIZE * 0.999621916911), (0, 0), align=None)
    chamfer_3_piece_14 = extrude(amount=30, mode=Mode.PRIVATE)
    chamfer_3_piece_14 = split(chamfer_3_piece_14, bisect_by=Plane(origin=(-25.732735257, 13.801206253, -180.732735257), z_dir=(0.7071067811865476, 0, -0.7071067811865476)), keep=Keep.TOP, mode=Mode.PRIVATE)
    chamfer_3_piece_14 = split(chamfer_3_piece_14, bisect_by=Plane(origin=(-20, 13.801206253, -182.64685828), z_dir=(-1, 0, 0)), keep=Keep.TOP, mode=Mode.PRIVATE)
    add(chamfer_3_piece_14)


solid = part.part
